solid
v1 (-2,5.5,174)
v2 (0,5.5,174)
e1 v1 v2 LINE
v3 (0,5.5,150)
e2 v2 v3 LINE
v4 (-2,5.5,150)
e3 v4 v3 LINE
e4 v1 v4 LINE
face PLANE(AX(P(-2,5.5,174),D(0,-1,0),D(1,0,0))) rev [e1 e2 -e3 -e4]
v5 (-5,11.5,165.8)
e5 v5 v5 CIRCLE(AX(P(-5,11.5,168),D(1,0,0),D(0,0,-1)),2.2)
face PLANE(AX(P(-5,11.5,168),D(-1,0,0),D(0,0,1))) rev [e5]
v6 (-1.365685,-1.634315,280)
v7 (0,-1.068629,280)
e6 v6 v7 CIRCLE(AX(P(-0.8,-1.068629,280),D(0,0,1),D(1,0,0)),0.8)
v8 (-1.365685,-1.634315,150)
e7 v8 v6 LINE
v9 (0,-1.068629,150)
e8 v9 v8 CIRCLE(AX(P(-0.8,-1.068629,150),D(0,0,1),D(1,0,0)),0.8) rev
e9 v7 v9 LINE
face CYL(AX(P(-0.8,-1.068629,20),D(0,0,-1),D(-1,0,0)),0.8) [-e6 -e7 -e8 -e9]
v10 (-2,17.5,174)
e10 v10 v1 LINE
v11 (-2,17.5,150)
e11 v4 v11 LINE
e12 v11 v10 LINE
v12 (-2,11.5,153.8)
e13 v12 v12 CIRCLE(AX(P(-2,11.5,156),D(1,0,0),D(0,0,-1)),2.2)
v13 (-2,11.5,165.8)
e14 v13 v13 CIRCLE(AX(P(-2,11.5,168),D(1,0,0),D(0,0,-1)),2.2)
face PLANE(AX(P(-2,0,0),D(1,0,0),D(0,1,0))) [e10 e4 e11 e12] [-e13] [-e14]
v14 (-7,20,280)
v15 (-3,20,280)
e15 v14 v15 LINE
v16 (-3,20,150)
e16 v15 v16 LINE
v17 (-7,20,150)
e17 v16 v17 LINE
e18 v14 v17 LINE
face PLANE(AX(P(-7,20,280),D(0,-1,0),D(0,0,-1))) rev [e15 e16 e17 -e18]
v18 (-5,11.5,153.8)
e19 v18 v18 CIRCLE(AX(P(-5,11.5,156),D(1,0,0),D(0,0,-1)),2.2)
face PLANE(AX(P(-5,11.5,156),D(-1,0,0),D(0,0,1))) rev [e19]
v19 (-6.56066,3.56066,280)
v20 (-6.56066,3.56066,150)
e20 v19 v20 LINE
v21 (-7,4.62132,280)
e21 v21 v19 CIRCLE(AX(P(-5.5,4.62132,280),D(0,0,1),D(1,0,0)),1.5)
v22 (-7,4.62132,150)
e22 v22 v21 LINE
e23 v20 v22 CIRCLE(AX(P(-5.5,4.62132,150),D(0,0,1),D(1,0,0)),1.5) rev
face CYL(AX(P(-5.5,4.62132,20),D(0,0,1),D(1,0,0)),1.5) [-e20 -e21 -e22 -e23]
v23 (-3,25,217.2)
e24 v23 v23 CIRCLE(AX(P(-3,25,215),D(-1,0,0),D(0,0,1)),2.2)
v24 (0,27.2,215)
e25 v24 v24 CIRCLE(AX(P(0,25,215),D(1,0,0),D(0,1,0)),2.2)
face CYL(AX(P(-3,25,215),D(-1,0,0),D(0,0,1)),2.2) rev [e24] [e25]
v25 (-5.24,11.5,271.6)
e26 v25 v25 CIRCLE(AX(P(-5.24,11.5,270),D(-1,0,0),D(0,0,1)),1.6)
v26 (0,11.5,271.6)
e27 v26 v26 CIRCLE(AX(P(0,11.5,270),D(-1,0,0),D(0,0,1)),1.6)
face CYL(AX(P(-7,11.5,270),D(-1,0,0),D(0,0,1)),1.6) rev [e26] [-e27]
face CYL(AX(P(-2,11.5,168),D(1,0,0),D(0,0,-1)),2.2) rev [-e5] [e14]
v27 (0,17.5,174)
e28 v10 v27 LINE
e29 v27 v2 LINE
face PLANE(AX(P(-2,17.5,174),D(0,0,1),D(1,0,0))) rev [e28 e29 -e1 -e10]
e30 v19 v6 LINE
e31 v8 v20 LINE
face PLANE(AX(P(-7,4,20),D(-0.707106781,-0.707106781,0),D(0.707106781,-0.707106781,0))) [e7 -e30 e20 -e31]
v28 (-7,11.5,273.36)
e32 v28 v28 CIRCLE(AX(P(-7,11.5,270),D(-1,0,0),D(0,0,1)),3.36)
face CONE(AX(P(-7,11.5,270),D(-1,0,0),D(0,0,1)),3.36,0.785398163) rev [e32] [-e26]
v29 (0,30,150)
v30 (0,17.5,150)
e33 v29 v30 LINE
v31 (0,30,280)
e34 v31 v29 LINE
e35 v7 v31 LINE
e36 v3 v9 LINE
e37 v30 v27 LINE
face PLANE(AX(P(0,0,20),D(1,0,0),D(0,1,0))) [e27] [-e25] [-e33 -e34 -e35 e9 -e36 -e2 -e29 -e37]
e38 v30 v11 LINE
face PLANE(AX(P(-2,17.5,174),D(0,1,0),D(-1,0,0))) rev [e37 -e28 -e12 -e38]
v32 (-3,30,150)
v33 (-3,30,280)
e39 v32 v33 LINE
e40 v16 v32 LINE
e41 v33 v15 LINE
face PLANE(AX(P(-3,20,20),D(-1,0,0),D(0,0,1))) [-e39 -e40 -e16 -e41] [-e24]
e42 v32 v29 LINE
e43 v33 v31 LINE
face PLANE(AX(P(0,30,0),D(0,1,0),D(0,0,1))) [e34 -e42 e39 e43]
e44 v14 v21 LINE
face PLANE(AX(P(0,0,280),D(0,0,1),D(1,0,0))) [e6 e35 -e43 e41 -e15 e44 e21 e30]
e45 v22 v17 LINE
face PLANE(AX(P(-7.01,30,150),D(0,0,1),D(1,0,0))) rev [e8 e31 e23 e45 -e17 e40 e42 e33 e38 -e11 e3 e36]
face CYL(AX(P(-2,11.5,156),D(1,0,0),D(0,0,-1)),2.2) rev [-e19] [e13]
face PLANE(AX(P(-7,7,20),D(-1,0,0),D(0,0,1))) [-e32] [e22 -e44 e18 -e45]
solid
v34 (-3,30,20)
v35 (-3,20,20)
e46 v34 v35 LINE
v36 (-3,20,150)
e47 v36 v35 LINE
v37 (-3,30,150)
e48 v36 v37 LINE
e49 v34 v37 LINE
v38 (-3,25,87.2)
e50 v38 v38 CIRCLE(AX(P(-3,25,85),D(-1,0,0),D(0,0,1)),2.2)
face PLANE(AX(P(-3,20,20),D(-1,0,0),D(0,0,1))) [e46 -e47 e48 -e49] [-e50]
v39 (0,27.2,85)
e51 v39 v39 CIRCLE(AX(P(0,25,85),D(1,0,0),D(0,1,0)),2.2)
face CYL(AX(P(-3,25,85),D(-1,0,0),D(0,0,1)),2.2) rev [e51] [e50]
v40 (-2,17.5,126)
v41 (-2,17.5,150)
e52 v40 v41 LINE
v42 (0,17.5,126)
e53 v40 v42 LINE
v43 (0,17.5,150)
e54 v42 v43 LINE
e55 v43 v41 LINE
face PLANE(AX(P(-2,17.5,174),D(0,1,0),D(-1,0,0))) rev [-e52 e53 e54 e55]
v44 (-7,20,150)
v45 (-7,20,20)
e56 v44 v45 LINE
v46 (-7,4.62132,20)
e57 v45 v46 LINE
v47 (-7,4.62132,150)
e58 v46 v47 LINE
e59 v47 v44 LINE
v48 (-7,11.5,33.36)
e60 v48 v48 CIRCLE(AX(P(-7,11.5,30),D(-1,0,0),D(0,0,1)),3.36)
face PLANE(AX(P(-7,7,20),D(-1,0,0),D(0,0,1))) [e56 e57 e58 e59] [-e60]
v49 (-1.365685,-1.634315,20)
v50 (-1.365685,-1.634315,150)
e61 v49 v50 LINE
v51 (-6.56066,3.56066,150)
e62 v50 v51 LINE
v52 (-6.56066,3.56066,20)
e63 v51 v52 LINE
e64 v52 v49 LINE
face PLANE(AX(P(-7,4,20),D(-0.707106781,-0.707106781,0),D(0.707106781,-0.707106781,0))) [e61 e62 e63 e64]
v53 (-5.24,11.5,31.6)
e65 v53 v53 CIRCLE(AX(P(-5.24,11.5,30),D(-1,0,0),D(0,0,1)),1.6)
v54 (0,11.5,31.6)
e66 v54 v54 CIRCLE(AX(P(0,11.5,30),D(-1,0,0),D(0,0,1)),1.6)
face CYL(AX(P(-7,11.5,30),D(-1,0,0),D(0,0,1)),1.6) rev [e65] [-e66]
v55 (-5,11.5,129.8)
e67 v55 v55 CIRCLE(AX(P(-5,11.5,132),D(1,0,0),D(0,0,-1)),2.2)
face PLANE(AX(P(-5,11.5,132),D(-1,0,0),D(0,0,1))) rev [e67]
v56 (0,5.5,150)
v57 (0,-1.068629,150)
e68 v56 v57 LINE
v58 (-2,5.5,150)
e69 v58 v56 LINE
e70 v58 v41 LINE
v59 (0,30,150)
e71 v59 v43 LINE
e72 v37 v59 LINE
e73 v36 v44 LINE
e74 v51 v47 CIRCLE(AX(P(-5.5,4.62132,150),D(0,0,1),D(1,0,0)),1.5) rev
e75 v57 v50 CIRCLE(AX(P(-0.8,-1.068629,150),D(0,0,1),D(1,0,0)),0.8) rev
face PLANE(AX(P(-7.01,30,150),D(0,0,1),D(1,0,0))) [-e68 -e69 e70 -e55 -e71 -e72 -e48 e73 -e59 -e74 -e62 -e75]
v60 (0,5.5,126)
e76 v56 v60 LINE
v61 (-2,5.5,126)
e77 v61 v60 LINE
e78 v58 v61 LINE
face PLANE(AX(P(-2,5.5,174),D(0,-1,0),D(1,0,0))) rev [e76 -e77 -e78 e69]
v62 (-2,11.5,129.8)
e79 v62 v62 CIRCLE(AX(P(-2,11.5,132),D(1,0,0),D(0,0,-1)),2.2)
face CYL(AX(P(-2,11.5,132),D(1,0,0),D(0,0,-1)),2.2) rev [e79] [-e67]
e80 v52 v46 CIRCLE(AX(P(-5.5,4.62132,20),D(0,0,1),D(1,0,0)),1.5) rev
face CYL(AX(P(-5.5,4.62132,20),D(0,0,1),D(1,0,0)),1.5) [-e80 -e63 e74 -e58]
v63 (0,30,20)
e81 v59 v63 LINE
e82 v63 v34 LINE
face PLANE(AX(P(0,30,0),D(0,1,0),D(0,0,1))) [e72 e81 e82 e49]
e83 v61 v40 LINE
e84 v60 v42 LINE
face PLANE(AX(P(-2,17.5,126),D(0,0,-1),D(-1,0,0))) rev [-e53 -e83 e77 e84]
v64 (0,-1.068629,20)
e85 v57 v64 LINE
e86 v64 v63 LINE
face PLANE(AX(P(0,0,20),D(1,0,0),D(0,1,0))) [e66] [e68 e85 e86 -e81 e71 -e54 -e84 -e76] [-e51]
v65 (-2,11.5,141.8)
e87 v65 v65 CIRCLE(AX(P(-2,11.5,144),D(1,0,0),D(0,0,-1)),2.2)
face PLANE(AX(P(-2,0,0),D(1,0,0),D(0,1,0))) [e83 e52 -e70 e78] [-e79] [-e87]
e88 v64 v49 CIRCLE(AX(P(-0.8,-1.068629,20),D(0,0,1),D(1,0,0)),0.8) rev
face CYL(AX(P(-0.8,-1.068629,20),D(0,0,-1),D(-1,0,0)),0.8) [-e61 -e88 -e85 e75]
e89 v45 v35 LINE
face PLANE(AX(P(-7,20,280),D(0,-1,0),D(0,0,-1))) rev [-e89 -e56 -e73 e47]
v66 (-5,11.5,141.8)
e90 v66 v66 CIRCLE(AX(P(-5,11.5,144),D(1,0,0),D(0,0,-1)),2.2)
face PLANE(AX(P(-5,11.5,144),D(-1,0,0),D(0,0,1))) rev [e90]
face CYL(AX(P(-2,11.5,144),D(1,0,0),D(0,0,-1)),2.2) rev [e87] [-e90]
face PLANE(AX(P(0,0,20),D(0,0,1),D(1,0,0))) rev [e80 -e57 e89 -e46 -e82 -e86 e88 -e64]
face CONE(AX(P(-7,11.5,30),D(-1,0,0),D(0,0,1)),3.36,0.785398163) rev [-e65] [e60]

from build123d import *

# Parameters (mm, degrees)
BOSS_EXTRUDE1_DEPTH                = 260
FILLET1_R                          = 1.5
SKETCH2_W                          = 20
SKETCH2_H                          = 260
CUT_EXTRUDE1_DEPTH                 = 10
FILLET2_R                          = 0.8
SKETCH4_W                          = 3
SKETCH4_H                          = 260
BOSS_EXTRUDE2_DEPTH                = 10
SKETCH3_W                          = 260
SKETCH3_H                          = 13
BOSS_EXTRUDE3_DEPTH                = 4
CSK_FOR_M3_SFHCS1_D                = 3.2
CSK_FOR_M3_SFHCS1_CSINK_D          = 6.72
CSK_FOR_M3_SFHCS1_CSINK_ANGLE      = 90
SPLIT1_SURFACE_1_BACK              = 263.039
SPLIT1_SURFACE_1_DEPTH             = 526.078
SPLIT1_SURFACE_2_BACK              = 263.039
SPLIT1_SURFACE_2_DEPTH             = 526.078
F_4_4_START                        = -3
F_4_4_4_4_DIAMETER_HOLE1_OUTLINE_R = 2.2
F_4_4_4_4_DIAMETER_HOLE1_DEPTH     = 3
SKETCH12_W                         = 48
SKETCH12_H                         = 12
CUT_EXTRUDE2_DEPTH                 = 2
F_4_4_START_2                      = -5
F_4_4_4_4_DIAMETER_HOLE2_OUTLINE_R = 2.2
F_4_4_4_4_DIAMETER_HOLE2_DEPTH     = 3


# Read off the part's stored shape, not the designer's step: Ø4.4 (4.4) Diameter Hole1, Ø4.4 (4.4) Diameter Hole2
with BuildPart() as part:
    # Sketch1 → Boss-Extrude1 (new body)
    with BuildSketch(Plane.XY.offset(280)):
        Polygon((-7, 4), (4, -7), (7, -7), (7, -3), (20, -3), (20, 0), (0, 0), (0, 20), (-3, 20), (-3, 7), (-7, 7), align=None)
    extrude(amount=-BOSS_EXTRUDE1_DEPTH)

    # Fillet1
    fillet1_edges = [part.edges().sort_by_distance(p)[0] for p in [
        (4, -7, 150),
        (-7, 4, 150),
    ]]
    fillet(fillet1_edges, radius=FILLET1_R)

    # Sketch2 → Cut-Extrude1 (cut)
    with BuildSketch(Plane(origin=(0, 0, 0), x_dir=(1, 0, 0), z_dir=(0, 1, 0))):
        with Locations((10, -150)):
            Rectangle(SKETCH2_W, SKETCH2_H)
    extrude(amount=-CUT_EXTRUDE1_DEPTH, mode=Mode.SUBTRACT)

    # Fillet2
    fillet2_edges = [part.edges().sort_by_distance(p)[0] for p in [
        (0, -3, 150),
    ]]
    fillet(fillet2_edges, radius=FILLET2_R)

    # Sketch4 → Boss-Extrude2 (add)
    with BuildSketch(Plane(origin=(0, 20, 0), x_dir=(1, 0, 0), z_dir=(0, 1, 0))):
        with Locations((-1.5, -150)):
            Rectangle(SKETCH4_W, SKETCH4_H)
    extrude(amount=BOSS_EXTRUDE2_DEPTH)

    # Sketch3 → Boss-Extrude3 (add)
    with BuildSketch(Plane.ZY.offset(3)):
        with Locations((150, 13.5)):
            Rectangle(SKETCH3_W, SKETCH3_H)
    extrude(amount=BOSS_EXTRUDE3_DEPTH)

    # CSK for M3 SFHCS1 (through all)
    with Locations(Plane.ZY.offset(7)):
        with Locations((30, 11.5), (270, 11.5)):
            CounterSinkHole(CSK_FOR_M3_SFHCS1_D / 2, CSK_FOR_M3_SFHCS1_CSINK_D / 2, counter_sink_angle=CSK_FOR_M3_SFHCS1_CSINK_ANGLE)


with BuildPart() as body_2:
    # Split1: the piece behind the surface
    add(part.part)
    # Split1 surface: a surface, the sketch's curves swept straight by 526.078 mm
    with BuildLine(Plane(origin=(0, 0, 0), x_dir=(0, 0, -1), z_dir=(1, 0, 0)).offset(-SPLIT1_SURFACE_1_BACK), mode=Mode.PRIVATE) as split1_surface_1_path:
        Line((-150, 30), (-150, -1.86862915))
    split1_surface_1 = Shell.extrude(split1_surface_1_path.wire(), (1 * SPLIT1_SURFACE_1_DEPTH, 0 * SPLIT1_SURFACE_1_DEPTH, 0 * SPLIT1_SURFACE_1_DEPTH))
    split(bisect_by=split1_surface_1, keep=Keep.BOTTOM)


with BuildPart() as part_1:
    add(part.part)

    # Split1: split by a surface, the side it looks to stays
    # Split1 surface: a surface, the sketch's curves swept straight by 526.078 mm
    with BuildLine(Plane(origin=(0, 0, 0), x_dir=(0, 0, -1), z_dir=(1, 0, 0)).offset(-SPLIT1_SURFACE_2_BACK), mode=Mode.PRIVATE) as split1_surface_2_path:
        Line((-150, 30), (-150, -1.86862915))
    split1_surface_2 = Shell.extrude(split1_surface_2_path.wire(), (1 * SPLIT1_SURFACE_2_DEPTH, 0 * SPLIT1_SURFACE_2_DEPTH, 0 * SPLIT1_SURFACE_2_DEPTH))
    split(bisect_by=split1_surface_2, keep=Keep.TOP)


with BuildPart() as f_4_4_4_4_diameter_hole1_tool:
    # Ø4.4 (4.4) Diameter Hole1 outline → Ø4.4 (4.4) Diameter Hole1 (new body)
    with BuildSketch(Plane.YZ.offset(F_4_4_START)):
        with Locations((25, 85)):
            Circle(F_4_4_4_4_DIAMETER_HOLE1_OUTLINE_R)
        with Locations((25, 215)):
            Circle(F_4_4_4_4_DIAMETER_HOLE1_OUTLINE_R)
    extrude(amount=F_4_4_4_4_DIAMETER_HOLE1_DEPTH)


with BuildPart() as part_2:
    add(part_1.part)

    # Ø4.4 (4.4) Diameter Hole1: cut by f_4_4_4_4_diameter_hole1_tool
    add(f_4_4_4_4_diameter_hole1_tool.part, mode=Mode.SUBTRACT)


with BuildPart() as body_2_1:
    add(body_2.part)

    # Ø4.4 (4.4) Diameter Hole1: cut by f_4_4_4_4_diameter_hole1_tool
    add(f_4_4_4_4_diameter_hole1_tool.part, mode=Mode.SUBTRACT)


with BuildPart() as cut_extrude2_tool:
    # Sketch12 → Cut-Extrude2 (new body)
    with BuildSketch(Plane(origin=(0, 0, 0), x_dir=(0, 0, -1), z_dir=(1, 0, 0))):
        with Locations((-150, 11.5)):
            Rectangle(SKETCH12_W, SKETCH12_H)
    extrude(amount=-CUT_EXTRUDE2_DEPTH)


with BuildPart() as part_3:
    add(part_2.part)

    # Cut-Extrude2: cut by cut_extrude2_tool
    add(cut_extrude2_tool.part, mode=Mode.SUBTRACT)


with BuildPart() as body_2_2:
    add(body_2_1.part)

    # Cut-Extrude2: cut by cut_extrude2_tool
    add(cut_extrude2_tool.part, mode=Mode.SUBTRACT)


with BuildPart() as f_4_4_4_4_diameter_hole2_tool:
    # Ø4.4 (4.4) Diameter Hole2 outline → Ø4.4 (4.4) Diameter Hole2 (new body)
    with BuildSketch(Plane.YZ.offset(F_4_4_START_2)):
        with Locations((11.5, 132)):
            Circle(F_4_4_4_4_DIAMETER_HOLE2_OUTLINE_R)
        with Locations((11.5, 144)):
            Circle(F_4_4_4_4_DIAMETER_HOLE2_OUTLINE_R)
        with Locations((11.5, 168)):
            Circle(F_4_4_4_4_DIAMETER_HOLE2_OUTLINE_R)
        with Locations((11.5, 156)):
            Circle(F_4_4_4_4_DIAMETER_HOLE2_OUTLINE_R)
    extrude(amount=F_4_4_4_4_DIAMETER_HOLE2_DEPTH)


with BuildPart() as part_4:
    add(part_3.part)

    # Ø4.4 (4.4) Diameter Hole2: cut by f_4_4_4_4_diameter_hole2_tool
    add(f_4_4_4_4_diameter_hole2_tool.part, mode=Mode.SUBTRACT)


with BuildPart() as body_2_3:
    add(body_2_2.part)

    # Ø4.4 (4.4) Diameter Hole2: cut by f_4_4_4_4_diameter_hole2_tool
    add(f_4_4_4_4_diameter_hole2_tool.part, mode=Mode.SUBTRACT)


solid = Compound([part_4.part, body_2_3.part])
